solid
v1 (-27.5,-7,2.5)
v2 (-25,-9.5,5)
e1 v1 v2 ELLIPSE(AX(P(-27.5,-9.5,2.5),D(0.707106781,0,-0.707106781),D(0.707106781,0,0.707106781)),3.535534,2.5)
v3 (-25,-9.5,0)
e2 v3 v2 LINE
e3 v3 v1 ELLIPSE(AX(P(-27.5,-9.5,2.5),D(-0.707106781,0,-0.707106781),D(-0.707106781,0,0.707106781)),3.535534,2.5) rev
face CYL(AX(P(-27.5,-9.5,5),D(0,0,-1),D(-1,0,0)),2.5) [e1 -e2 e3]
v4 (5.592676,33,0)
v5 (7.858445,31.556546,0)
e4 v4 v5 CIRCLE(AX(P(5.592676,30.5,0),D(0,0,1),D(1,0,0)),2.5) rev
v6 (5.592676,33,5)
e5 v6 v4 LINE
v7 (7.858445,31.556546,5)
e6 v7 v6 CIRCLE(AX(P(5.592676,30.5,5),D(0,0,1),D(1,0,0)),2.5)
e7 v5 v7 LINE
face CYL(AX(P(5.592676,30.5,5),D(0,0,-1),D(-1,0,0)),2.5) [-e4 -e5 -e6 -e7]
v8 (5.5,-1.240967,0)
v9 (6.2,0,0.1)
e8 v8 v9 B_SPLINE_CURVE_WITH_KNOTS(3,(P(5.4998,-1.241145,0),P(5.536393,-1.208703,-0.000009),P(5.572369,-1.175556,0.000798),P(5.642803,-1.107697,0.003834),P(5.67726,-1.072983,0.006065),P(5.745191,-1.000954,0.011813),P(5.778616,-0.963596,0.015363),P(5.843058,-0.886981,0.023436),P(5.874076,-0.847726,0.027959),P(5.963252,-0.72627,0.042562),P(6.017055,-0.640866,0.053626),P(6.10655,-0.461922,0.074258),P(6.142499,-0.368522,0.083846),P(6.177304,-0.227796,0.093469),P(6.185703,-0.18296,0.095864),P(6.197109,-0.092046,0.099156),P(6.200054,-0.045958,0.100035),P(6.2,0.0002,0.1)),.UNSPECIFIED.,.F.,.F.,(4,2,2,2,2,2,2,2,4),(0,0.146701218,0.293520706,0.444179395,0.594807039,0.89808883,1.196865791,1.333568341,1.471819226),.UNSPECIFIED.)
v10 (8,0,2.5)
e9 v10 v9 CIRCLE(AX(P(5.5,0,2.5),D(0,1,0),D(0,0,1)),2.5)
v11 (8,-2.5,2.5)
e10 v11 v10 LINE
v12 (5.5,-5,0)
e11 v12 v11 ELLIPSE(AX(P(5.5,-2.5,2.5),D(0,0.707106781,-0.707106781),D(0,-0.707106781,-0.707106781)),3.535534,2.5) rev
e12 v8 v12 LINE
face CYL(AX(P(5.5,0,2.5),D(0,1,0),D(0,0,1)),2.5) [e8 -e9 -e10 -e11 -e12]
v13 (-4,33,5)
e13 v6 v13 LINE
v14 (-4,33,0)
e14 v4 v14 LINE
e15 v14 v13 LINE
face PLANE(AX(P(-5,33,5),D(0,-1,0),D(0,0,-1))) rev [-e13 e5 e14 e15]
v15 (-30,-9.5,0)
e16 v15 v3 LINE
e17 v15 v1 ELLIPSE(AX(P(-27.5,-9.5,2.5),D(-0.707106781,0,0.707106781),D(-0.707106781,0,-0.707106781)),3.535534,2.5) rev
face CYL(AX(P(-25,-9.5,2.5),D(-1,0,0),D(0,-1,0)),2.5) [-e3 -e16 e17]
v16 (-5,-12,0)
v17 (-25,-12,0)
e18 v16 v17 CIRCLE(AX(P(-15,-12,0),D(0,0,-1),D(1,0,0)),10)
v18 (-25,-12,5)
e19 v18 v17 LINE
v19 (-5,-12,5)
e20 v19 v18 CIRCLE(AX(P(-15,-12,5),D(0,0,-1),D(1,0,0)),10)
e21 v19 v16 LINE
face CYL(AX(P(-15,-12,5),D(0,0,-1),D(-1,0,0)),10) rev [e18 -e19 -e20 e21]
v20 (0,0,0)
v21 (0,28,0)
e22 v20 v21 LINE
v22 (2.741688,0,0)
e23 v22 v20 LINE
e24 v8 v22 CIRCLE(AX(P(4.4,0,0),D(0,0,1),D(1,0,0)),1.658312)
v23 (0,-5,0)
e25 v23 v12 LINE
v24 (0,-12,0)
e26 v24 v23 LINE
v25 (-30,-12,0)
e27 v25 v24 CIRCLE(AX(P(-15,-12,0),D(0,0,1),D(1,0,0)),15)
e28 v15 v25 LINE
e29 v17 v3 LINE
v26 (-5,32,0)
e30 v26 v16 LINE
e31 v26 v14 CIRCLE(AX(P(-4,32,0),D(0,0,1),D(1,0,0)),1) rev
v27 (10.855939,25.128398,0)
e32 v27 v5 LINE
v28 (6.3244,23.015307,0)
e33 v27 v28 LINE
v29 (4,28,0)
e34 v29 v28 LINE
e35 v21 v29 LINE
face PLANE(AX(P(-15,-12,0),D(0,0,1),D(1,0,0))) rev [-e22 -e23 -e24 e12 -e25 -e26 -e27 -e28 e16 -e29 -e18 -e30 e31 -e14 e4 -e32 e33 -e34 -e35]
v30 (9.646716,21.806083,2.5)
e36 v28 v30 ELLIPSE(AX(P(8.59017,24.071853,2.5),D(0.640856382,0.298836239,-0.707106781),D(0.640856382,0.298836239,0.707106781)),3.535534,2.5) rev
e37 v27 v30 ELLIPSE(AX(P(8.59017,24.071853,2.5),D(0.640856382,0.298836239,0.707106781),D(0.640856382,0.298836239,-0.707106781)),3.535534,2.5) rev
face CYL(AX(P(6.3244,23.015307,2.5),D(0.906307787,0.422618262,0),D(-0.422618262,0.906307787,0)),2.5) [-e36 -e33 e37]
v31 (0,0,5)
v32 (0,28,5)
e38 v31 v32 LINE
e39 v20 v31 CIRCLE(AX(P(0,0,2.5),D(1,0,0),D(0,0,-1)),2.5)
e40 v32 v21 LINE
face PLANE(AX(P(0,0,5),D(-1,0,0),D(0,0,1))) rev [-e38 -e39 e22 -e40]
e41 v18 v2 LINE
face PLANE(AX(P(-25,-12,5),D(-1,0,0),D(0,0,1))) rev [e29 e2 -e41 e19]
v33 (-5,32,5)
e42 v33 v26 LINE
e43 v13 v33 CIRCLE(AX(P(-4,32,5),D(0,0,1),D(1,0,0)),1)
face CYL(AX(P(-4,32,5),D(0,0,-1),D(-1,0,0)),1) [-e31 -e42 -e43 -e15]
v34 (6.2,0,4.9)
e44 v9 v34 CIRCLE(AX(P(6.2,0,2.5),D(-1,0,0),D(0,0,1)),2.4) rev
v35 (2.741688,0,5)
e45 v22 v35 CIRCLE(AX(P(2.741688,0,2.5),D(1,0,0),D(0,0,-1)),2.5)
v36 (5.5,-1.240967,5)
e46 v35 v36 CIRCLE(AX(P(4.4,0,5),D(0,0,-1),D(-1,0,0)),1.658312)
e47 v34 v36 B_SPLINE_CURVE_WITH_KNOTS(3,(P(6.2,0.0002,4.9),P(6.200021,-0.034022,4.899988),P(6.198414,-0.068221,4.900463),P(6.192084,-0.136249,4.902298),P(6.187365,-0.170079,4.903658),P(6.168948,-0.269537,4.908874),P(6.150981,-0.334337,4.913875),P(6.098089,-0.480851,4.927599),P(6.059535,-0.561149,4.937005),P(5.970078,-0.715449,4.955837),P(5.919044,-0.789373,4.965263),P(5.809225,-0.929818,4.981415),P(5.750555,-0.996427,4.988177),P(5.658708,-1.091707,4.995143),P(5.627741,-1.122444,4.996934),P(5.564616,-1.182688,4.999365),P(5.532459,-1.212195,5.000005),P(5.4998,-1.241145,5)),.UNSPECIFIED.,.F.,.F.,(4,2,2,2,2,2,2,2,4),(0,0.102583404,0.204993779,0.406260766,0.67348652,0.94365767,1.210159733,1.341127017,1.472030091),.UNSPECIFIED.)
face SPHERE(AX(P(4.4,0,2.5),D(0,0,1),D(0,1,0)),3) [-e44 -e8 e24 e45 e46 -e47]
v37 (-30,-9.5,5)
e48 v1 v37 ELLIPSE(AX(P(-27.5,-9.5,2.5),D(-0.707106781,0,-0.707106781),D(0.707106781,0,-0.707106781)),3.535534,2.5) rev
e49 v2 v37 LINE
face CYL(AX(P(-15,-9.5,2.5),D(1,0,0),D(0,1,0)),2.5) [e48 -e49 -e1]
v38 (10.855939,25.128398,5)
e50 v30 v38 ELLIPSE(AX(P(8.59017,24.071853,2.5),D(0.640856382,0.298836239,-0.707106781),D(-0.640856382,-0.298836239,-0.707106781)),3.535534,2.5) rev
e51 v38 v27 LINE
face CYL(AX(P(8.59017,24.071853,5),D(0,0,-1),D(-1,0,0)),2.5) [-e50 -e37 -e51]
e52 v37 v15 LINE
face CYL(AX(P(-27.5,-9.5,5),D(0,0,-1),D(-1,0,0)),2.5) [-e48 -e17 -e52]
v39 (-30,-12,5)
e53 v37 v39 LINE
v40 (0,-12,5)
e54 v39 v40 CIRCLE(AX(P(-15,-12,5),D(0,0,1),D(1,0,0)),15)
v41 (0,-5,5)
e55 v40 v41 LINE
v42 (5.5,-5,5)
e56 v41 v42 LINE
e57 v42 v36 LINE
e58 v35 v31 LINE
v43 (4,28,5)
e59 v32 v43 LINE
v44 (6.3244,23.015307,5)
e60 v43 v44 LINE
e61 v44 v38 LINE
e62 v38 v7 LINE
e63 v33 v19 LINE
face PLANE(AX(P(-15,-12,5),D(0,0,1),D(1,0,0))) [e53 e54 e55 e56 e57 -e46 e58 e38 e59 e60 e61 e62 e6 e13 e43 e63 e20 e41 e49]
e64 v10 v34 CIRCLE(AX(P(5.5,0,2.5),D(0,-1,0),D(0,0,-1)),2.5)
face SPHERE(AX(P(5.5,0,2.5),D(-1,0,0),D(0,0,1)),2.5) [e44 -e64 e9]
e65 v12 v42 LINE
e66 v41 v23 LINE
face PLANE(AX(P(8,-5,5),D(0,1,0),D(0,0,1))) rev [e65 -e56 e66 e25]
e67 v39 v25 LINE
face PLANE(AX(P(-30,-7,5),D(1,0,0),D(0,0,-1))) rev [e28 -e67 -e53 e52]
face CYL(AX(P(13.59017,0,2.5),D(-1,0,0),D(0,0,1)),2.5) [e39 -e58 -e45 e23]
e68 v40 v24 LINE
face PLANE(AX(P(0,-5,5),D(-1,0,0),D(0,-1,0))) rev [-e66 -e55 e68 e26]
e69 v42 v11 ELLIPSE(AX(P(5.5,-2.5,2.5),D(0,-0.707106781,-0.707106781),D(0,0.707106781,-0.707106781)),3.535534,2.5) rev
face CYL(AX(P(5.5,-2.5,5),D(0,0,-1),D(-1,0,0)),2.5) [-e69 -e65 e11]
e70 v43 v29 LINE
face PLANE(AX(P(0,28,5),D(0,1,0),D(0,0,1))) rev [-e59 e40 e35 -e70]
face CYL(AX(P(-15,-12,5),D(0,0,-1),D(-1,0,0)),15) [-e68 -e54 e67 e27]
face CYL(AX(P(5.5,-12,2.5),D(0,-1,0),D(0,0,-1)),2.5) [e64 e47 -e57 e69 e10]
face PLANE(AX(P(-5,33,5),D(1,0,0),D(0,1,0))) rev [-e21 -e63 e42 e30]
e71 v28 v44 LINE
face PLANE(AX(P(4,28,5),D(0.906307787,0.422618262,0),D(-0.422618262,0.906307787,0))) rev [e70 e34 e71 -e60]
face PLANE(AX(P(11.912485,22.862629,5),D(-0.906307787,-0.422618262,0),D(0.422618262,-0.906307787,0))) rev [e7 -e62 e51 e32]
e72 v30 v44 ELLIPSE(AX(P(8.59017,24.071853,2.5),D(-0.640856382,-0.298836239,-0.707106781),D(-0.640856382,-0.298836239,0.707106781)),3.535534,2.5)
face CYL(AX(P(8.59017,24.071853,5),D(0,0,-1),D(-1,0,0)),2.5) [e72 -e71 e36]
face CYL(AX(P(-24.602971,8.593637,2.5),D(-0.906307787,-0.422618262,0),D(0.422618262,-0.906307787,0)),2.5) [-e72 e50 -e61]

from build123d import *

# Parameters (mm, degrees)
EXTRUDE_1_DEPTH     = 5
FILLET_1_R          = 2.5
FILLET_2_R          = 1
EXTRUDE_2_DEPTH     = 8
FILLET_3_R          = 2.5
SKETCH_5_W          = 1.467751534
SKETCH_5_H          = 4.178210798
SKETCH_5_W_2        = 1.389566385
CUT_EXTRUDE_1_DEPTH = 20


with BuildPart() as part:
    # 草图1 → 凸台-拉伸1 (new body)
    with BuildSketch(Plane.XY):
        with BuildLine():
            Line((0, 0), (0, 28))
            Line((0, 28), (4, 28))
            Line((4, 28), (7.380946094, 20.749537704))
            Line((7.380946094, 20.749537704), (11.912485029, 22.862629012))
            Line((11.912485029, 22.862629012), (7.185351304, 33))
            Line((7.185351304, 33), (-5, 33))
            Line((-5, 33), (-5, -12))
            ThreePointArc((-5, -12), (-15, -22), (-25, -12))
            Line((-25, -12), (-25, -7))
            Line((-25, -7), (-30, -7))
            Line((-30, -7), (-30, -12))
            ThreePointArc((-30, -12), (-15, -27), (0, -12))
            Line((0, -12), (0, -5))
            Line((0, -5), (8, -5))
            Line((8, -5), (8, 0))
            Line((8, 0), (0, 0))
        make_face()
    extrude(amount=EXTRUDE_1_DEPTH)

    # 圆角1
    fillet_1_edges = [part.edges().sort_by_distance(p)[0] for p in [
        (-27.5, -7, 0),
        (9.646715562, 21.806083358, 0),
        (9.646715562, 21.806083358, 5),
        (-30, -7, 2.5),
        (-25, -7, 2.5),
        (7.185351304, 33, 2.5),
        (11.912485029, 22.862629012, 2.5),
        (7.380946094, 20.749537704, 2.5),
        (-27.5, -7, 5),
    ]]
    fillet(fillet_1_edges, radius=FILLET_1_R - 0.0001)  # a hair under: the kernel refuses the full size

    # 圆角2
    fillet_2_edges = [part.edges().sort_by_distance(p)[0] for p in [
        (-5, 33, 2.5),
    ]]
    fillet(fillet_2_edges, radius=FILLET_2_R)

    # 草图3 → 凸台-拉伸2 (add)
    with BuildSketch(Plane(origin=(0, 0, 0), x_dir=(0, 0, -1), z_dir=(1, 0, 0))):
        with BuildLine():
            Line((-5, 0), (0, 0))
            ThreePointArc((0, 0), (-2.5, 2.5), (-5, 0))
        make_face()
    extrude(amount=EXTRUDE_2_DEPTH)

    # 圆角3
    fillet_3_edges = [part.edges().sort_by_distance(p)[0] for p in [
        (8, -2.5, 0),
        (8, -5, 2.5),
        (8, -2.5, 5),
        (8, 2.5, 2.5),
    ]]
    fillet(fillet_3_edges, radius=FILLET_3_R - 0.0001)  # a hair under: the kernel refuses the full size

    # 草图4 → 旋转3 (revolve)
    with BuildSketch(Plane(origin=(4.4, 0, 0), x_dir=(0, 0, -1), z_dir=(1, 0, 0))):
        with BuildLine():
            Line((-5.5, 0), (0.5, 0))
            ThreePointArc((0.5, 0), (-2.5, 3), (-5.5, 0))
        make_face()
    revolve(axis=Axis((4.4, 0, 2.5), (0, 0, -1)))

    # 草图5 → 切除-拉伸1 (cut)
    with BuildSketch(Plane.ZY.offset(5)):
        with Locations((-0.733875767, -0.010051234)):
            Rectangle(SKETCH_5_W, SKETCH_5_H)
        with Locations((5.694783193, -0.010051234)):
            Rectangle(SKETCH_5_W_2, SKETCH_5_H)
    extrude(amount=-CUT_EXTRUDE_1_DEPTH, mode=Mode.SUBTRACT)


solid = part.part
